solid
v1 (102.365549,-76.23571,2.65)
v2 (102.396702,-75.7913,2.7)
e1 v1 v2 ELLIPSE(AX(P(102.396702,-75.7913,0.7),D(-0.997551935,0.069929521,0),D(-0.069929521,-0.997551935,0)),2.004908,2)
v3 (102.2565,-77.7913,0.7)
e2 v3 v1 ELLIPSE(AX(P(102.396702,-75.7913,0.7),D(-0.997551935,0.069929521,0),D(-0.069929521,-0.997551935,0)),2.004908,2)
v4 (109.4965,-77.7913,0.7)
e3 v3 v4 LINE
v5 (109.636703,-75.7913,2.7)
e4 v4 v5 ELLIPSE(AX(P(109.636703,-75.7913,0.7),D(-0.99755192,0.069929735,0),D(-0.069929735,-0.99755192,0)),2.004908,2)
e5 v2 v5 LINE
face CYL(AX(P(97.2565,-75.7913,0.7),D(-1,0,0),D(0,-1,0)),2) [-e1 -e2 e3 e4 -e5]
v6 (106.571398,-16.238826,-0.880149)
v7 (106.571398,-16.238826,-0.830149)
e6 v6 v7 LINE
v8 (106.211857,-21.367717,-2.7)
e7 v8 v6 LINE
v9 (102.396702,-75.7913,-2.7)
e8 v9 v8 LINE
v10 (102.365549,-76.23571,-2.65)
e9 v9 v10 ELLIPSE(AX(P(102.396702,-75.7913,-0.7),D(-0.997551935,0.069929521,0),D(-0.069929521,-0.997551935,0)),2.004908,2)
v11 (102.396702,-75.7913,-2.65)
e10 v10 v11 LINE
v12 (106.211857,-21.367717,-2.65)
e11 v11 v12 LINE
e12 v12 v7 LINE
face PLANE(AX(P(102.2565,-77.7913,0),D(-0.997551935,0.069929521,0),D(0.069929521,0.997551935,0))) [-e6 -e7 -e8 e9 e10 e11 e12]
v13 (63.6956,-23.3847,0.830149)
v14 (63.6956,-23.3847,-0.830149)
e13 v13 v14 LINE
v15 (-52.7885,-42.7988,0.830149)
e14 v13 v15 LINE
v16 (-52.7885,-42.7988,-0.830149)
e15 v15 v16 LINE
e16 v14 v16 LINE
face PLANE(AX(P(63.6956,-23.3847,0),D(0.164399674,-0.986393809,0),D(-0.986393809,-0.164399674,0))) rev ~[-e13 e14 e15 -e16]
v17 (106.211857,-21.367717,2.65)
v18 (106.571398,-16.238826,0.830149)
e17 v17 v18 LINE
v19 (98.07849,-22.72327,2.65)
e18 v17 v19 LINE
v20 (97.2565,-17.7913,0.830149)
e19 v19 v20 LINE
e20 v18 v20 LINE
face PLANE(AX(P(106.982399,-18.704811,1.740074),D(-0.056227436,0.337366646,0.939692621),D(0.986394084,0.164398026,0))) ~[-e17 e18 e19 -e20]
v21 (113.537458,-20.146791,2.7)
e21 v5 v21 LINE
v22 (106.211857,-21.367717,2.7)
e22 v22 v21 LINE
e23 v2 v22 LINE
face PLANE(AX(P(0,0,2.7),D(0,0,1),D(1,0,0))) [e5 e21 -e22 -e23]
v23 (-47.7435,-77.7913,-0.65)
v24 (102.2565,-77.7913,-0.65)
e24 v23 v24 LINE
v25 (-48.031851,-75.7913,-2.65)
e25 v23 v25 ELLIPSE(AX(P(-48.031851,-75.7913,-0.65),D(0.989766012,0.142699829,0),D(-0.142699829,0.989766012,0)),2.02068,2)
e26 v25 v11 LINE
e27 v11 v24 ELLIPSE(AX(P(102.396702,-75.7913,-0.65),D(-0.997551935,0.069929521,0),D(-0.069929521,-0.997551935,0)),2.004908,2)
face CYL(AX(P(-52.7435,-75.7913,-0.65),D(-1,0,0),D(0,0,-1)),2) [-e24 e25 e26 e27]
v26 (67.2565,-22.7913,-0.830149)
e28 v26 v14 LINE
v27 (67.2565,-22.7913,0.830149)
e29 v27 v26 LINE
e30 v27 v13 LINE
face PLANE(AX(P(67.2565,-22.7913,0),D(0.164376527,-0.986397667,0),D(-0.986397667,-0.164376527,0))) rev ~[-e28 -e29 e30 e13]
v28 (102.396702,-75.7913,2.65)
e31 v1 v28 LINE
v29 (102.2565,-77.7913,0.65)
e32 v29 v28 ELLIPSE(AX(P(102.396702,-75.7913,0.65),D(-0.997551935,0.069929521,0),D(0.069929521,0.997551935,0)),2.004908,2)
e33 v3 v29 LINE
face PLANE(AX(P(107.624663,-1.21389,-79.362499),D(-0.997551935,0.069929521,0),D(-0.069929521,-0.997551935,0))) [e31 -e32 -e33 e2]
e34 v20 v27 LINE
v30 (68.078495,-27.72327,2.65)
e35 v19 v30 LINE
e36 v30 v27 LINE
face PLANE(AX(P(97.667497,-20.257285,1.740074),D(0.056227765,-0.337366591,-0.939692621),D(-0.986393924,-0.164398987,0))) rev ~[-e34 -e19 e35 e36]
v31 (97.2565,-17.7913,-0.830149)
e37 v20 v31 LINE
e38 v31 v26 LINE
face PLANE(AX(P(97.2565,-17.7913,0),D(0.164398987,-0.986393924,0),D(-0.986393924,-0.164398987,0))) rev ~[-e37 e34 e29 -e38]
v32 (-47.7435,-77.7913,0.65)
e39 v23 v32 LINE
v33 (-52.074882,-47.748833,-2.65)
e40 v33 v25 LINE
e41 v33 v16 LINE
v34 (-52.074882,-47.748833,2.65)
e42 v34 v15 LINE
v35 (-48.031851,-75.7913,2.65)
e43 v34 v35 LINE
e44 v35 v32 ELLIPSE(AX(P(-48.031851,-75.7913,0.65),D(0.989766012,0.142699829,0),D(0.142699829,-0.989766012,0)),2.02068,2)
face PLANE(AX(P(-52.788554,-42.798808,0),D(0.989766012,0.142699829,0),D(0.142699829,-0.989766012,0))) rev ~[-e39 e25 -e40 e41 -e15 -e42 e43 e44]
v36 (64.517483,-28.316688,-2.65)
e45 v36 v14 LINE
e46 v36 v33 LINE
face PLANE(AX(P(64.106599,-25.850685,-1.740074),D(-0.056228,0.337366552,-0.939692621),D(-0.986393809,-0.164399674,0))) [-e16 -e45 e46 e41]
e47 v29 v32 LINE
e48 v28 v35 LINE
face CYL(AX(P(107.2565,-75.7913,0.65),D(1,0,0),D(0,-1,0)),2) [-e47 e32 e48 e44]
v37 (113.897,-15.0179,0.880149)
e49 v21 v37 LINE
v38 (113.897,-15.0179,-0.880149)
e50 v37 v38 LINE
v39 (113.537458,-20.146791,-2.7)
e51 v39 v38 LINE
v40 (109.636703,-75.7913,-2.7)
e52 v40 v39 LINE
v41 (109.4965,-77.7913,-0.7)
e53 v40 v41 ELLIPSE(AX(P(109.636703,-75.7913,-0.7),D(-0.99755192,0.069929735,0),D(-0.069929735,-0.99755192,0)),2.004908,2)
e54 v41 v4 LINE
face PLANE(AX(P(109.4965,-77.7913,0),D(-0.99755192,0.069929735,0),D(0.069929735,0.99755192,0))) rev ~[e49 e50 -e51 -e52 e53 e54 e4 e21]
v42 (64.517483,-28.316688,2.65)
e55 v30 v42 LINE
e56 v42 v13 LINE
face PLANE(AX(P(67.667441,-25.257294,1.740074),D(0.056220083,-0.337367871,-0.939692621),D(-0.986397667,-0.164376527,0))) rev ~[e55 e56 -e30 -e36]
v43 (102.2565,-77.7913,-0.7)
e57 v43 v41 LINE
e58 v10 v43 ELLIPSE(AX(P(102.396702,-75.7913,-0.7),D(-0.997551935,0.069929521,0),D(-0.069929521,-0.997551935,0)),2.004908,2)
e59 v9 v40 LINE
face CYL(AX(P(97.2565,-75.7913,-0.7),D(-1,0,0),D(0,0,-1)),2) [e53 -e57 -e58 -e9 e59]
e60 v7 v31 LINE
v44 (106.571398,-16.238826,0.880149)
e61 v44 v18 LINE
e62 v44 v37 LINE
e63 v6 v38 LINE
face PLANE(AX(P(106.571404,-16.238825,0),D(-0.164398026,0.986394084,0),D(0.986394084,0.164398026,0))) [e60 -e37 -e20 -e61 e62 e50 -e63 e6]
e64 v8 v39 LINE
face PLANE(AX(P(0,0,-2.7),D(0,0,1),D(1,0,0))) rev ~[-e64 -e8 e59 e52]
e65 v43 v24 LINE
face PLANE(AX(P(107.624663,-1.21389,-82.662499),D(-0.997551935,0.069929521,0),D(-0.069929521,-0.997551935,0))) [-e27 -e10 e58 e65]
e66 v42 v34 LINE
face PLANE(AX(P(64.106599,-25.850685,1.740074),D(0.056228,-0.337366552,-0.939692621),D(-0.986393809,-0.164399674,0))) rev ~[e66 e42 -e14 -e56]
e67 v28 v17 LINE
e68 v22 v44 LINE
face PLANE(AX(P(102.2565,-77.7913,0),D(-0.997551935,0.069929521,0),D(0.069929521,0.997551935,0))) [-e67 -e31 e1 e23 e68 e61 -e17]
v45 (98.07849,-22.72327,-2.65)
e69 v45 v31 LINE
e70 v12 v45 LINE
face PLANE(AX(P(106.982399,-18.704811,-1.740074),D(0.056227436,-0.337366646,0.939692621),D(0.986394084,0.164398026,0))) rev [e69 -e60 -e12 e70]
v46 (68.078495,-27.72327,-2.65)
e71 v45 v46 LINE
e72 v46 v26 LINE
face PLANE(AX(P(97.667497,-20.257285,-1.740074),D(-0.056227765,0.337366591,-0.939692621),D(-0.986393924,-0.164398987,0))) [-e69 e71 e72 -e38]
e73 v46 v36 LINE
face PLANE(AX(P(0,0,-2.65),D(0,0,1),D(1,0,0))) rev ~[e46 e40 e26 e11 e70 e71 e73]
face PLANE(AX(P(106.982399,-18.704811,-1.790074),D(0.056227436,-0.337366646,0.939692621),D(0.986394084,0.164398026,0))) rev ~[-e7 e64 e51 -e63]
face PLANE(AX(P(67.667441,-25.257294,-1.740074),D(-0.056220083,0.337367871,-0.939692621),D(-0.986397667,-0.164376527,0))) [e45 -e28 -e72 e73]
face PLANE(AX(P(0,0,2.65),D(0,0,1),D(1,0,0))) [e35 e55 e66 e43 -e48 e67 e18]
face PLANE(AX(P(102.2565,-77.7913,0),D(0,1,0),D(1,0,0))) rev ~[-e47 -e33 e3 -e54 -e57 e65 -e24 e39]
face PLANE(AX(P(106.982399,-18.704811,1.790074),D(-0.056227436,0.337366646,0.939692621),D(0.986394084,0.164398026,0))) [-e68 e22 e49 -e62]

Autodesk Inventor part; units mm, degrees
ref_plane "YZ Plane" through (0, 0, 0) normal (1, 0, 0) x (0, 1, 0)
ref_plane "XZ Plane" through (0, 0, 0) normal (0, 1, 0) x (-1, 0, 0)
ref_plane "XY Plane" through (0, 0, 0) normal (0, 0, 1) x (1, 0, 0)
sketch "Sketch1" plane through (0, 0, 0) normal (0, 0, 1) x (1, 0, 0)
  line L0 (-47.7435, -77.7913) -> (102.2565, -77.7913)
  line L1 (102.2565, -77.7913) -> (109.4965, -77.7913)
  line L2 (-47.7435, -77.7913) -> (-47.7435, -13.2313) construction
  line L3 (-47.7435, -13.2313) -> (-47.7435, 15.6487) construction
  line L4 (-47.7435, -77.7913) -> (-47.7435, -72.7913)
  line L5 (-47.7435, -72.7913) -> (-61.2235, -72.7913) construction
  line L6 (-47.7435, -72.7913) -> (-47.7435, -57.7913) construction
  line L7 (-47.7435, -57.7913) -> (-65.2735, -57.7913) construction
  line L8 (-47.7435, -57.7913) -> (-47.7435, -42.7913) construction
  line L9 (-47.7435, -42.7913) -> (-67.4235, -42.7913) construction
  line L10 (-47.7435, -42.7913) -> (-47.7435, -27.7913) construction
  line L11 (-47.7435, -27.7913) -> (-69.5835, -27.7913) construction
  line L12 (-47.7435, -27.7913) -> (-47.7435, -12.7913) construction
  line L13 (-47.7435, -12.7913) -> (-72.3735, -12.7913) construction
  line L14 (-47.7435, -77.7913) -> (42.2565, -77.7913)
  line L15 (42.2565, -77.7913) -> (42.2565, 92.2087) construction
  line L16 (42.2565, 92.2087) -> (-47.7435, 15.6487)
  line L17 (42.2565, 92.2087) -> (47.8065, 92.2087)
  line L18 (42.2565, -77.7913) -> (67.2565, -77.7913)
  line L19 (67.2565, -77.7913) -> (67.2565, -22.7913) construction
  line L20 (67.2565, -22.7913) -> (63.6956, -23.3847)
  line L21 (102.2565, -77.7913) -> (97.2565, -77.7913)
  line L22 (97.2565, -77.7913) -> (97.2565, -17.7913) construction
  line L23 (97.2565, -17.7913) -> (113.897, -15.0179)
  line L24 (109.4965, -77.7913) -> (113.897, -15.0179)
  line L25 (97.2565, -17.7913) -> (67.2565, -22.7913)
  line L26 (63.6956, -23.3847) -> (47.8065, 92.2087)
  spline S0 degree 2 poles (42.2565, 92.2087) (45.0586, 96.9623) (47.8065, 92.2087) knots 0 0 0 1 1 1
  line L27 (-59.7435, -93.9838) -> (-59.7435, 5.4407) construction
  line L28 (-47.7435, 15.6487) -> (-59.7435, 5.4407)
  line L29 (-59.7435, 5.4407) -> (-47.7435, -77.7913)
  line L30 (-69.5835, -27.7913) -> (-65.2735, -57.7913)
  line L31 (-47.7435, -77.7913) -> (-61.2235, -72.7913) construction
  line L32 (-61.2235, -72.7913) -> (-65.2735, -57.7913) construction
  spline S1 degree 2 poles (-47.7435, -77.7913) (-61.2235, -72.7913) (-65.2735, -57.7913) knots 1 1 1 2 2 2
  line L33 (-69.5835, -27.7913) -> (-72.3735, -12.7913) construction
  line L34 (-72.3735, -12.7913) -> (-59.7435, 5.4407) construction
  spline S2 degree 2 poles (-69.5835, -27.7913) (-72.3735, -12.7913) (-59.7435, 5.4407) knots 1 1 1 2 2 2
  line L35 (102.2565, -77.7913) -> (106.5714, -16.2388)
  line L36 (63.6956, -23.3847) -> (-52.7885, -42.7988)
  line L37 (-131.9637, -55.9946) -> (-133.7071, -56.2852)
  point P0 (0, 0)
  point P1 (45.0505, 94.5855)
  point P2 (-53.7435, 10.5447)
  dimension "d0" = 150
  dimension "d1" = 7.24
  dimension "d2" = 64.56
  dimension "d3" = 28.88
  dimension "d4" = 13.48
  dimension "d5" = 15
  dimension "d6" = 17.53
  dimension "d7" = 15
  dimension "d8" = 19.68
  dimension "d9" = 15
  dimension "d10" = 21.84
  dimension "d11" = 15
  dimension "d12" = 24.63
  dimension "d13" = 90
  dimension "d14" = 170
  dimension "d15" = 5.55
  dimension "d16" = 25
  dimension "d17" = 55
  dimension "d18" = 3.61
  dimension "d19" = 5
  dimension "d20" = 60
  dimension "d21" = 16.87
  dimension "d22" = 12
  dimension "d23" = 5
extrude "Extrusion1" add sketch "Sketch1" along normal mid plane 5.3 contours L29 L36 L20 L25 L23 L35 L0
extrude "Extrusion2" add sketch "Sketch1" along normal mid plane 5.4 contours L35 L23 L24 L1
chamfer "Chamfer1" distance 5 angle 20 1 edges at (26.8914, -29.5188, 2.65) measured on face at (52.0131, -45.6096, 2.65)
chamfer "Chamfer2" distance 5 angle 20 1 edges at (110.2342, -15.6283, 2.7) measured on face at (109.9883, -36.3493, 2.7)
chamfer "Chamfer3" distance 5 angle 20 1 edges at (26.8914, -29.5188, -2.65) measured on face at (52.0131, -45.6096, -2.65)
chamfer "Chamfer4" distance 5 angle 20 1 edges at (110.2342, -15.6283, -2.7) measured on face at (109.9883, -36.3493, -2.7)
fillet "Fillet1" radius 2 4 edges at (27.2565, -77.7913, -2.65) (105.8765, -77.7913, -2.7) (27.2565, -77.7913, 2.65) (105.8765, -77.7913, 2.7)
